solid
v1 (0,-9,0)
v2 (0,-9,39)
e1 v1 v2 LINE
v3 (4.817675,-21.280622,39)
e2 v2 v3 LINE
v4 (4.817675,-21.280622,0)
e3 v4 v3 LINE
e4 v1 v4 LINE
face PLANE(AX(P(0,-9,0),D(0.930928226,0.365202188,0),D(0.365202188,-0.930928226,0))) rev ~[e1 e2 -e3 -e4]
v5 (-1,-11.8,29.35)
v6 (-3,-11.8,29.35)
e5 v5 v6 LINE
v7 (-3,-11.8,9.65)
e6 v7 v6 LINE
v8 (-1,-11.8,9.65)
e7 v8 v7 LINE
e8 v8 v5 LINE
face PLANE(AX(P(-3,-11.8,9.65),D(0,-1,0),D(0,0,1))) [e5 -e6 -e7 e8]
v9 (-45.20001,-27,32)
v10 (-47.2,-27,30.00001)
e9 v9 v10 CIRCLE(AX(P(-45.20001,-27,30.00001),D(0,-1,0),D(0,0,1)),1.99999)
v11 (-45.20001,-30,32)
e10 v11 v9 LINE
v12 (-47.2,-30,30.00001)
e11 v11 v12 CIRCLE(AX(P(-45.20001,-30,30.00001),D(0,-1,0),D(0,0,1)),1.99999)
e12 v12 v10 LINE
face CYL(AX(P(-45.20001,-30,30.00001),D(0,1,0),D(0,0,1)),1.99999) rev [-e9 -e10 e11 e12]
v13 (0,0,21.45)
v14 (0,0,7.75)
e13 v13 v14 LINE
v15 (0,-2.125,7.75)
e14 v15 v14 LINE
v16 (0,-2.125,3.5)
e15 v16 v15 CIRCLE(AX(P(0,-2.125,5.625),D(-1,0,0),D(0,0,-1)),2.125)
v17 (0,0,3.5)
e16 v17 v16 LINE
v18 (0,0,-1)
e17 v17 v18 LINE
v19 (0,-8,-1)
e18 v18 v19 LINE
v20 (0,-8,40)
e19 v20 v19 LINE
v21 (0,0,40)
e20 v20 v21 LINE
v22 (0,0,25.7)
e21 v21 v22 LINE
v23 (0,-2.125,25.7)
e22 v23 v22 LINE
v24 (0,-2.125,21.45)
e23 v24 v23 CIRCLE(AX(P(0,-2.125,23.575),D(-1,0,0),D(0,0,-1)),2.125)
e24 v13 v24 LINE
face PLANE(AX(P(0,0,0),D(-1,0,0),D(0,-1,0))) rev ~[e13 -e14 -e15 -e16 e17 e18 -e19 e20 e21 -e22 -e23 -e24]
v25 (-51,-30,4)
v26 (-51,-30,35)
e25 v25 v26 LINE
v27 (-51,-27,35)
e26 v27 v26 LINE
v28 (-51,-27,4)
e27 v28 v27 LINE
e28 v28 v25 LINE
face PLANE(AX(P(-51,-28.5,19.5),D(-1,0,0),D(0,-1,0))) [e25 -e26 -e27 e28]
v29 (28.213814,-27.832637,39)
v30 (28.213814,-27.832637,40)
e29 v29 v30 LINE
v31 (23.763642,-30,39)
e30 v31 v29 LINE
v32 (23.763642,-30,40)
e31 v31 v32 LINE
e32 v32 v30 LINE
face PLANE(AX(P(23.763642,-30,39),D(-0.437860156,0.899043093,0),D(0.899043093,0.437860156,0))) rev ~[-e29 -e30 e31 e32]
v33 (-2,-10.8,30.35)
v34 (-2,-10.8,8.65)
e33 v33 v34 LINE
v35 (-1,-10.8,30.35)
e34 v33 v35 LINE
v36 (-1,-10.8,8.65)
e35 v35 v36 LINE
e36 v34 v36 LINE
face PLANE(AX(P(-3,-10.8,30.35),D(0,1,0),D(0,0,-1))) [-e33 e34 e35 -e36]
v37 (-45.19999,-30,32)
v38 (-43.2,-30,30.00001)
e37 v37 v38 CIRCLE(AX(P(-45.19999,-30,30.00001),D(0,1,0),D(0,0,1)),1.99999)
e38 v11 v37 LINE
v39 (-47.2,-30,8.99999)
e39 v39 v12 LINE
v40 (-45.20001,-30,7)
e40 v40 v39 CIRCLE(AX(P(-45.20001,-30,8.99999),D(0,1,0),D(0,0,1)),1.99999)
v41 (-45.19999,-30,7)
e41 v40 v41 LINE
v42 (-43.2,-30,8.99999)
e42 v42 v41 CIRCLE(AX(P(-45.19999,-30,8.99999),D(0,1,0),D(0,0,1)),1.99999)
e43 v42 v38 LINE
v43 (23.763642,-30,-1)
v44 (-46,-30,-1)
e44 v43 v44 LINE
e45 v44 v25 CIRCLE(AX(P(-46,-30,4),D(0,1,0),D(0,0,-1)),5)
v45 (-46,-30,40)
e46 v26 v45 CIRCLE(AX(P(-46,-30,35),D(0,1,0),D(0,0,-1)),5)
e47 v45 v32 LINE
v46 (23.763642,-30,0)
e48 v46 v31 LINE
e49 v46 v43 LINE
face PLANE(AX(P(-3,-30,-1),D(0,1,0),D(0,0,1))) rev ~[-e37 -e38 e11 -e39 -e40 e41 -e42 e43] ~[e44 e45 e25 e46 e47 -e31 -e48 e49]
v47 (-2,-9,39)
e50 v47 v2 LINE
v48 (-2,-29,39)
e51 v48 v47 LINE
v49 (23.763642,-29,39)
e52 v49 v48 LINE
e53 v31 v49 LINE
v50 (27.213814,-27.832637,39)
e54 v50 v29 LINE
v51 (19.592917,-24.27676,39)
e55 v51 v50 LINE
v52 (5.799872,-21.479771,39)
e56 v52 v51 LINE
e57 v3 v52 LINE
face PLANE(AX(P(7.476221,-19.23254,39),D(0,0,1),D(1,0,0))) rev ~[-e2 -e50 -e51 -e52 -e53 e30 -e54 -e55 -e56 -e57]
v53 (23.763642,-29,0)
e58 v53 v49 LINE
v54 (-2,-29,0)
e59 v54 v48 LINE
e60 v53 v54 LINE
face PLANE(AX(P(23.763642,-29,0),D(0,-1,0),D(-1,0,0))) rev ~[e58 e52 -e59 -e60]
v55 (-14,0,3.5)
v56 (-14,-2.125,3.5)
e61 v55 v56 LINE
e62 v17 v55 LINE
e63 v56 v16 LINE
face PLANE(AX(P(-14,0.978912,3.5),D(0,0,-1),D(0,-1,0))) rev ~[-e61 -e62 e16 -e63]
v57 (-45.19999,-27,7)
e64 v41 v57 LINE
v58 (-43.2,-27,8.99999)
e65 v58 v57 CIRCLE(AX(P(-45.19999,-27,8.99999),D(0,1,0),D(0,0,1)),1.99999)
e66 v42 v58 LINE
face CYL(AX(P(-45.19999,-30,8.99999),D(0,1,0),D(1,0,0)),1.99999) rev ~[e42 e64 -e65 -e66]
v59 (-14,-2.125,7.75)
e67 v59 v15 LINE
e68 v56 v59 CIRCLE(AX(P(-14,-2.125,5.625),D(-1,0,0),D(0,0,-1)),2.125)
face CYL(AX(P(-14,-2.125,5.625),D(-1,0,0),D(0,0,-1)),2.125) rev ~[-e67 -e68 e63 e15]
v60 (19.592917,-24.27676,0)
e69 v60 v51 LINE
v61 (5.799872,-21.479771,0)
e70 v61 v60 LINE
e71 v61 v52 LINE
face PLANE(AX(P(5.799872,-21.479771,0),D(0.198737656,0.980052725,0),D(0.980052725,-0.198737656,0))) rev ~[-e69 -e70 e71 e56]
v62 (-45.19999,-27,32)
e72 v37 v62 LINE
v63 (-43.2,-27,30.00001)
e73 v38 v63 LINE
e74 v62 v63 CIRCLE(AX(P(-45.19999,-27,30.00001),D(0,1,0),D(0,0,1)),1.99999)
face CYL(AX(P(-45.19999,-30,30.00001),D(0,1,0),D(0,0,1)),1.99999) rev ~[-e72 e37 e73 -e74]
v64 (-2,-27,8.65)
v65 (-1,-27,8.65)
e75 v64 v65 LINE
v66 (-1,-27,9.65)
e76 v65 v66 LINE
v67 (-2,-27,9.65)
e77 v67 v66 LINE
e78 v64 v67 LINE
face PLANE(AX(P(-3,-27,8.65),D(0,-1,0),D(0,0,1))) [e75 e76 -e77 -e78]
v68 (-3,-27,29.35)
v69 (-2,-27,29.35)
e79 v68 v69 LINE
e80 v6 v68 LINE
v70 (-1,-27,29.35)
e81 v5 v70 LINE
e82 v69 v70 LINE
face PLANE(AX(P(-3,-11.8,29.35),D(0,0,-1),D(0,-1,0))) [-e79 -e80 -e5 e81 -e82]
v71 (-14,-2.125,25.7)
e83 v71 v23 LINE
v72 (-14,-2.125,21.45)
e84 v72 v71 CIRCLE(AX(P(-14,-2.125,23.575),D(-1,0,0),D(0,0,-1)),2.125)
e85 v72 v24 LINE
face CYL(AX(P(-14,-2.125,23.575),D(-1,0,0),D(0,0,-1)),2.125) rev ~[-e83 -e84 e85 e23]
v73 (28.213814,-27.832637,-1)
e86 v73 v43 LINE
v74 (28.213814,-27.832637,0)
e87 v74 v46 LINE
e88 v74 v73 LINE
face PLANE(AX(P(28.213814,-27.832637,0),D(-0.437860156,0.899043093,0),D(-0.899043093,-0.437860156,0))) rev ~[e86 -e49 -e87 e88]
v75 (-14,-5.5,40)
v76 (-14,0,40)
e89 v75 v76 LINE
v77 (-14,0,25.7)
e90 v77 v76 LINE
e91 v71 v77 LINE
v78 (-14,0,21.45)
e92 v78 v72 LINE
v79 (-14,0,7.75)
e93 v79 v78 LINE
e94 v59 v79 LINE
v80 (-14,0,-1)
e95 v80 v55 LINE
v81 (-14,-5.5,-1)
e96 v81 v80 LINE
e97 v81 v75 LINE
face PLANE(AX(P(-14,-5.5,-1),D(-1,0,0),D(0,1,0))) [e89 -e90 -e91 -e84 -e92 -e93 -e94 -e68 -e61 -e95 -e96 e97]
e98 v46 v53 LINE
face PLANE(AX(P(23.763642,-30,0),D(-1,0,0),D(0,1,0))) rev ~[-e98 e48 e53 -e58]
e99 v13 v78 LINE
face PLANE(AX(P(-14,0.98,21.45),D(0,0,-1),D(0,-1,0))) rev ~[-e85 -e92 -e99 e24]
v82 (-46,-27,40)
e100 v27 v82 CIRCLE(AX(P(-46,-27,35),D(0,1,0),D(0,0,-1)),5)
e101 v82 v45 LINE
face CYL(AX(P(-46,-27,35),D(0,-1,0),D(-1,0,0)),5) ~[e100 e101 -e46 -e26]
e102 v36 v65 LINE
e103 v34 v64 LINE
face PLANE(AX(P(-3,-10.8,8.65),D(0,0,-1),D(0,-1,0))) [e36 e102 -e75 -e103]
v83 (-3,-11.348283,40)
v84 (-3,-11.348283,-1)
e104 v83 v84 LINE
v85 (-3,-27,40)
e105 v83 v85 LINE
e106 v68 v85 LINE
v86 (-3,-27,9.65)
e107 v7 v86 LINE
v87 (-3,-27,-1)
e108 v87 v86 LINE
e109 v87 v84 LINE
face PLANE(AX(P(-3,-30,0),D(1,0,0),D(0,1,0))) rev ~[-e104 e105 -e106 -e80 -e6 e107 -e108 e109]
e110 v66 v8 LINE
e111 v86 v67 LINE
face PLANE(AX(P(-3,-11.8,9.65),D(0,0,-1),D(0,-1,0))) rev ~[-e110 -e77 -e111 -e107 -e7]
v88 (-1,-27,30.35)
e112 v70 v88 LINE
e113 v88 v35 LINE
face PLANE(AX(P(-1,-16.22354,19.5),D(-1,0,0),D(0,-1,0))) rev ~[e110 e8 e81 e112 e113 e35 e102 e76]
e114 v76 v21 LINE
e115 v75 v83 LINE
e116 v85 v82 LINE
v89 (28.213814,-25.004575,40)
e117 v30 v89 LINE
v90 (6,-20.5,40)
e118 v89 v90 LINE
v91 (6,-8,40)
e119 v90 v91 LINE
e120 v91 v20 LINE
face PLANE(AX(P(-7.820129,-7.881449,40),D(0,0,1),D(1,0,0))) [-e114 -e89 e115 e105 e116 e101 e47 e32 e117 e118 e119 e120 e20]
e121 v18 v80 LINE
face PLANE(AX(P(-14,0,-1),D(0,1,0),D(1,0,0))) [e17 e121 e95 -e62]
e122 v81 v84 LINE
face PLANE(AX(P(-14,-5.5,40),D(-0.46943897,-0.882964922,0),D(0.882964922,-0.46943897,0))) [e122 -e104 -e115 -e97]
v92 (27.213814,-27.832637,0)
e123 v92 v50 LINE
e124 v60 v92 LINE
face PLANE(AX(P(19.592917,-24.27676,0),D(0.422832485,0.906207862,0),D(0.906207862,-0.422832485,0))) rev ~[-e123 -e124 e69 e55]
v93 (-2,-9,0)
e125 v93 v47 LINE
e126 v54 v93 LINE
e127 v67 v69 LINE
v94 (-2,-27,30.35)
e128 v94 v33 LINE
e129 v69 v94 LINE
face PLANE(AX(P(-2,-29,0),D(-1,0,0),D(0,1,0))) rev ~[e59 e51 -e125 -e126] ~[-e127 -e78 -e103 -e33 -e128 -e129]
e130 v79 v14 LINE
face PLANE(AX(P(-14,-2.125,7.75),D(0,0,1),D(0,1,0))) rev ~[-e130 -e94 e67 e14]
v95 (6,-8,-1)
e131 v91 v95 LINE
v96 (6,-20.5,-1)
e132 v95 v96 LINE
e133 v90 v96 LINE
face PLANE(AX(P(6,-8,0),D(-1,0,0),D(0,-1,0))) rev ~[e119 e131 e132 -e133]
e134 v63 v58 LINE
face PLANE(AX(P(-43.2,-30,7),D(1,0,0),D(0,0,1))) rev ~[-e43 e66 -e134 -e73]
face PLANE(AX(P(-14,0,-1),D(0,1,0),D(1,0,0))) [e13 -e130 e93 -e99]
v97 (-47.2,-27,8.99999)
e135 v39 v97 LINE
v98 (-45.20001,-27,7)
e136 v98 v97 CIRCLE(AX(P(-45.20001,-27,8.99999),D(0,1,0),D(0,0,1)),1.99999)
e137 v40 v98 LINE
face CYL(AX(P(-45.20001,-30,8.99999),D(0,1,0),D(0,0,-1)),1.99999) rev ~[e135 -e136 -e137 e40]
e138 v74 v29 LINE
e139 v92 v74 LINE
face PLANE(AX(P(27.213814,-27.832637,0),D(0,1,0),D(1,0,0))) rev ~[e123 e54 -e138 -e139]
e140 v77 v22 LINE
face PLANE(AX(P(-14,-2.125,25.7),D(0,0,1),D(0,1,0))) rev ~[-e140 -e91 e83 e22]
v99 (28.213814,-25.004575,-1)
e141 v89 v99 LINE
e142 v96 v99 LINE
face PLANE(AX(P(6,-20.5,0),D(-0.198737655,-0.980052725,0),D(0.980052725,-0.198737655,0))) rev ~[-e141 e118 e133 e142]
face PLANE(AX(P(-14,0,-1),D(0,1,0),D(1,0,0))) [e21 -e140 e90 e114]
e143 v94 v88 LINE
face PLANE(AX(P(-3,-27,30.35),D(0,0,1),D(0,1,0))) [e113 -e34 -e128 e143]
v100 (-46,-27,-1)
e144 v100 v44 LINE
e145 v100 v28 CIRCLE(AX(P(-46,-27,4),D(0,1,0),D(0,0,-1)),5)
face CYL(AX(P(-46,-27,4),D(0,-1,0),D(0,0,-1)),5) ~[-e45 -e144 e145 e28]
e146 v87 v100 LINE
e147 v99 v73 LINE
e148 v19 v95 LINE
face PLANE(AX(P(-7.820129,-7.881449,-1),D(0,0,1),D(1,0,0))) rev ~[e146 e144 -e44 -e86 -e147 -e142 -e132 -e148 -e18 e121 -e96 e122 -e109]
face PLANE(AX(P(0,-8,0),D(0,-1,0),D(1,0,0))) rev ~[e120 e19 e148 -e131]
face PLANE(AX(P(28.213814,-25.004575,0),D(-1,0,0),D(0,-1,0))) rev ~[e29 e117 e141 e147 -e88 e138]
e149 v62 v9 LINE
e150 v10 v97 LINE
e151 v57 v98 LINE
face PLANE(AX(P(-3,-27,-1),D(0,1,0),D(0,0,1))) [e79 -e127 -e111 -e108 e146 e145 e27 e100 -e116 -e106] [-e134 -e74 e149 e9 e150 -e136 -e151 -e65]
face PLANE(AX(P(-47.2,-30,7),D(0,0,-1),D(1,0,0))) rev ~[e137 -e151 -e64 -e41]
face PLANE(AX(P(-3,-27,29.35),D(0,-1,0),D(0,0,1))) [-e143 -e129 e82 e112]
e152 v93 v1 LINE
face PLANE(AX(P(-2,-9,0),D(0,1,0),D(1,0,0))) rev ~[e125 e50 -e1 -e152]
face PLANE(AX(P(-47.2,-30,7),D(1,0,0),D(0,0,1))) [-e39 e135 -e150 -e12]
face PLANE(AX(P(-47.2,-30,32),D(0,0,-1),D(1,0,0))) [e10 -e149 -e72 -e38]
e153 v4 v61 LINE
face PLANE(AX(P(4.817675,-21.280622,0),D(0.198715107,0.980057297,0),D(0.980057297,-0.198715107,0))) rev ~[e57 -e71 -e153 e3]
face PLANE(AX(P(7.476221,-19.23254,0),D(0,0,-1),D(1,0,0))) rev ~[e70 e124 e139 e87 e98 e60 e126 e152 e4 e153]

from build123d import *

# Parameters (mm, degrees)
F1_DEPTH  = 39
F3_DEPTH  = 1
F5_DEPTH  = 1
F6_W      = 3
F6_H      = 41
F7_DEPTH  = 48
F8_W      = 4
F8_H      = 25
F9_DEPTH  = 30.001
F10_R     = 1.99999
F11_R     = 5
F12_W     = 15.2
F12_H     = 19.7
F13_DEPTH = 3
F15_DEPTH = 2
F17_DEPTH = 41
F19_DEPTH = 25
F21_DEPTH = 41


# Not quite as in the source:
# - a fillet or chamfer is up to 0.001 mm smaller than in the source, because OpenCascade refuses the exact size
# - ends of sketch curves that miss each other by under 0.0002 mm in the source are joined


with BuildPart() as f1:
    # F0 (on Top) → F1 (new body)
    with BuildSketch(Plane.XY):
        Polygon((0, -8), (0, 0), (-3, 0), (-3, -30), (23.763641715, -30), (23.763641715, -29), (-2, -29), (-2, -9), (0, -9), (4.8176753794, -21.2806219141), (5.7998719041, -21.4797707681), (19.5929166818, -24.2767604715), (27.2138139009, -27.8326366097), (28.2138139009, -27.8326366097), (28.2138139009, -25.9040332723), (28.2138139009, -25.0045752954), (6, -20.5), (6, -8), align=None)
    extrude(amount=F1_DEPTH)

    # F2 (on face) → F3 (join)
    with BuildSketch(Plane.XY.offset(39)):
        Polygon((0, 0), (-3, 0), (-3, -30), (23.763641715, -30), (28.2138139009, -27.8326366097), (28.2138139009, -25.0045752954), (6, -20.5), (6, -8), (0, -8), align=None)
    extrude(amount=F3_DEPTH)

    # F4 (on face) → F5 (join)
    with BuildSketch(Plane(origin=(0, 0, 0), x_dir=(1, 0, 0), z_dir=(0, 0, -1))):
        Polygon((-3, 0), (0, 0), (0, 8), (6, 8), (6, 20.5), (28.2138139009, 25.0045752954), (28.2138139009, 27.8326366097), (23.763641715, 30), (-3, 30), align=None)
    extrude(amount=F5_DEPTH)

    # F6 (on face) → F7 (join)
    with BuildSketch(Plane(origin=(-3, 0, 0), x_dir=(0, -1, 0), z_dir=(-1, 0, 0))):
        with Locations((28.5, 19.5)):
            Rectangle(F6_W, F6_H)
    extrude(amount=F7_DEPTH)

    # F8 (on face) → F9 (cut, through all)
    with BuildSketch(Plane.XZ.offset(30)):
        with Locations((-45.2, 19.5)):
            Rectangle(F8_W, F8_H)
    extrude(amount=-F9_DEPTH, mode=Mode.SUBTRACT)

    # F10 (radius 2 in the source; OpenCascade refuses exactly that, so slightly less here)
    f10_edges = [f1.edges().sort_by_distance(p)[0] for p in [
        (-47.2, -28.5, 32),
        (-43.2, -28.5, 32),
        (-47.2, -28.5, 7),
        (-43.2, -28.5, 7),
    ]]
    fillet(f10_edges, radius=F10_R)

    # F11
    f11_edges = [f1.edges().sort_by_distance(p)[0] for p in [
        (-51, -28.5, 40),
        (-51, -28.5, -1),
    ]]
    fillet(f11_edges, radius=F11_R)

    # F12 (on face) → F13 (cut)
    with BuildSketch(Plane(origin=(-3, 0, 0), x_dir=(0, -1, 0), z_dir=(-1, 0, 0))):
        with Locations((19.4, 19.5)):
            Rectangle(F12_W, F12_H)
    extrude(amount=-F13_DEPTH, mode=Mode.SUBTRACT)

    # F14 (on face) → F15 (join)
    with BuildSketch(Plane(origin=(-3, 0, 0), x_dir=(0, -1, 0), z_dir=(-1, 0, 0))):
        Polygon((10.8, 30.35), (10.8, 8.65), (27, 8.65), (27, 9.65), (11.8, 9.65), (11.8, 29.35), (27, 29.35), (27, 30.35), align=None)
    extrude(amount=-F15_DEPTH)

    # F16 (on face) → F17 (join, through all)
    with BuildSketch(Plane(origin=(0, 0, -1), x_dir=(1, 0, 0), z_dir=(0, 0, -1))):
        Polygon((-14, 0), (-3, 0), (-3, 8), (-14, 5.5), align=None)
    extrude(amount=-F17_DEPTH)

    # F18 (on face) → F19 (cut)
    with BuildSketch(Plane(origin=(-14, 0, 0), x_dir=(0, -1, 0), z_dir=(-1, 0, 0))):
        with BuildLine():
            Line((-0.9789119939, 3.5), (2.125, 3.5))
            ThreePointArc((2.125, 3.5), (4.25, 5.625), (2.125, 7.75))
            Line((2.125, 7.75), (-0.9789119939, 7.75))
            Line((-0.9789119939, 7.75), (-0.9789119939, 3.5))
        make_face()
        with BuildLine():
            Line((-0.98, 21.45), (2.125, 21.45))
            ThreePointArc((2.125, 21.45), (4.25, 23.575), (2.125, 25.7))
            Line((2.125, 25.7), (-0.98, 25.7))
            Line((-0.98, 25.7), (-0.98, 21.45))
        make_face()
    extrude(amount=-F19_DEPTH, mode=Mode.SUBTRACT)

    # F20 (on face) → F21 (join, through all)
    with BuildSketch(Plane.XY.offset(40)):
        Polygon((-3, -8), (-14, -5.5), (-3, -11.3482829183), align=None)
    extrude(amount=-F21_DEPTH)


solid = f1.part
